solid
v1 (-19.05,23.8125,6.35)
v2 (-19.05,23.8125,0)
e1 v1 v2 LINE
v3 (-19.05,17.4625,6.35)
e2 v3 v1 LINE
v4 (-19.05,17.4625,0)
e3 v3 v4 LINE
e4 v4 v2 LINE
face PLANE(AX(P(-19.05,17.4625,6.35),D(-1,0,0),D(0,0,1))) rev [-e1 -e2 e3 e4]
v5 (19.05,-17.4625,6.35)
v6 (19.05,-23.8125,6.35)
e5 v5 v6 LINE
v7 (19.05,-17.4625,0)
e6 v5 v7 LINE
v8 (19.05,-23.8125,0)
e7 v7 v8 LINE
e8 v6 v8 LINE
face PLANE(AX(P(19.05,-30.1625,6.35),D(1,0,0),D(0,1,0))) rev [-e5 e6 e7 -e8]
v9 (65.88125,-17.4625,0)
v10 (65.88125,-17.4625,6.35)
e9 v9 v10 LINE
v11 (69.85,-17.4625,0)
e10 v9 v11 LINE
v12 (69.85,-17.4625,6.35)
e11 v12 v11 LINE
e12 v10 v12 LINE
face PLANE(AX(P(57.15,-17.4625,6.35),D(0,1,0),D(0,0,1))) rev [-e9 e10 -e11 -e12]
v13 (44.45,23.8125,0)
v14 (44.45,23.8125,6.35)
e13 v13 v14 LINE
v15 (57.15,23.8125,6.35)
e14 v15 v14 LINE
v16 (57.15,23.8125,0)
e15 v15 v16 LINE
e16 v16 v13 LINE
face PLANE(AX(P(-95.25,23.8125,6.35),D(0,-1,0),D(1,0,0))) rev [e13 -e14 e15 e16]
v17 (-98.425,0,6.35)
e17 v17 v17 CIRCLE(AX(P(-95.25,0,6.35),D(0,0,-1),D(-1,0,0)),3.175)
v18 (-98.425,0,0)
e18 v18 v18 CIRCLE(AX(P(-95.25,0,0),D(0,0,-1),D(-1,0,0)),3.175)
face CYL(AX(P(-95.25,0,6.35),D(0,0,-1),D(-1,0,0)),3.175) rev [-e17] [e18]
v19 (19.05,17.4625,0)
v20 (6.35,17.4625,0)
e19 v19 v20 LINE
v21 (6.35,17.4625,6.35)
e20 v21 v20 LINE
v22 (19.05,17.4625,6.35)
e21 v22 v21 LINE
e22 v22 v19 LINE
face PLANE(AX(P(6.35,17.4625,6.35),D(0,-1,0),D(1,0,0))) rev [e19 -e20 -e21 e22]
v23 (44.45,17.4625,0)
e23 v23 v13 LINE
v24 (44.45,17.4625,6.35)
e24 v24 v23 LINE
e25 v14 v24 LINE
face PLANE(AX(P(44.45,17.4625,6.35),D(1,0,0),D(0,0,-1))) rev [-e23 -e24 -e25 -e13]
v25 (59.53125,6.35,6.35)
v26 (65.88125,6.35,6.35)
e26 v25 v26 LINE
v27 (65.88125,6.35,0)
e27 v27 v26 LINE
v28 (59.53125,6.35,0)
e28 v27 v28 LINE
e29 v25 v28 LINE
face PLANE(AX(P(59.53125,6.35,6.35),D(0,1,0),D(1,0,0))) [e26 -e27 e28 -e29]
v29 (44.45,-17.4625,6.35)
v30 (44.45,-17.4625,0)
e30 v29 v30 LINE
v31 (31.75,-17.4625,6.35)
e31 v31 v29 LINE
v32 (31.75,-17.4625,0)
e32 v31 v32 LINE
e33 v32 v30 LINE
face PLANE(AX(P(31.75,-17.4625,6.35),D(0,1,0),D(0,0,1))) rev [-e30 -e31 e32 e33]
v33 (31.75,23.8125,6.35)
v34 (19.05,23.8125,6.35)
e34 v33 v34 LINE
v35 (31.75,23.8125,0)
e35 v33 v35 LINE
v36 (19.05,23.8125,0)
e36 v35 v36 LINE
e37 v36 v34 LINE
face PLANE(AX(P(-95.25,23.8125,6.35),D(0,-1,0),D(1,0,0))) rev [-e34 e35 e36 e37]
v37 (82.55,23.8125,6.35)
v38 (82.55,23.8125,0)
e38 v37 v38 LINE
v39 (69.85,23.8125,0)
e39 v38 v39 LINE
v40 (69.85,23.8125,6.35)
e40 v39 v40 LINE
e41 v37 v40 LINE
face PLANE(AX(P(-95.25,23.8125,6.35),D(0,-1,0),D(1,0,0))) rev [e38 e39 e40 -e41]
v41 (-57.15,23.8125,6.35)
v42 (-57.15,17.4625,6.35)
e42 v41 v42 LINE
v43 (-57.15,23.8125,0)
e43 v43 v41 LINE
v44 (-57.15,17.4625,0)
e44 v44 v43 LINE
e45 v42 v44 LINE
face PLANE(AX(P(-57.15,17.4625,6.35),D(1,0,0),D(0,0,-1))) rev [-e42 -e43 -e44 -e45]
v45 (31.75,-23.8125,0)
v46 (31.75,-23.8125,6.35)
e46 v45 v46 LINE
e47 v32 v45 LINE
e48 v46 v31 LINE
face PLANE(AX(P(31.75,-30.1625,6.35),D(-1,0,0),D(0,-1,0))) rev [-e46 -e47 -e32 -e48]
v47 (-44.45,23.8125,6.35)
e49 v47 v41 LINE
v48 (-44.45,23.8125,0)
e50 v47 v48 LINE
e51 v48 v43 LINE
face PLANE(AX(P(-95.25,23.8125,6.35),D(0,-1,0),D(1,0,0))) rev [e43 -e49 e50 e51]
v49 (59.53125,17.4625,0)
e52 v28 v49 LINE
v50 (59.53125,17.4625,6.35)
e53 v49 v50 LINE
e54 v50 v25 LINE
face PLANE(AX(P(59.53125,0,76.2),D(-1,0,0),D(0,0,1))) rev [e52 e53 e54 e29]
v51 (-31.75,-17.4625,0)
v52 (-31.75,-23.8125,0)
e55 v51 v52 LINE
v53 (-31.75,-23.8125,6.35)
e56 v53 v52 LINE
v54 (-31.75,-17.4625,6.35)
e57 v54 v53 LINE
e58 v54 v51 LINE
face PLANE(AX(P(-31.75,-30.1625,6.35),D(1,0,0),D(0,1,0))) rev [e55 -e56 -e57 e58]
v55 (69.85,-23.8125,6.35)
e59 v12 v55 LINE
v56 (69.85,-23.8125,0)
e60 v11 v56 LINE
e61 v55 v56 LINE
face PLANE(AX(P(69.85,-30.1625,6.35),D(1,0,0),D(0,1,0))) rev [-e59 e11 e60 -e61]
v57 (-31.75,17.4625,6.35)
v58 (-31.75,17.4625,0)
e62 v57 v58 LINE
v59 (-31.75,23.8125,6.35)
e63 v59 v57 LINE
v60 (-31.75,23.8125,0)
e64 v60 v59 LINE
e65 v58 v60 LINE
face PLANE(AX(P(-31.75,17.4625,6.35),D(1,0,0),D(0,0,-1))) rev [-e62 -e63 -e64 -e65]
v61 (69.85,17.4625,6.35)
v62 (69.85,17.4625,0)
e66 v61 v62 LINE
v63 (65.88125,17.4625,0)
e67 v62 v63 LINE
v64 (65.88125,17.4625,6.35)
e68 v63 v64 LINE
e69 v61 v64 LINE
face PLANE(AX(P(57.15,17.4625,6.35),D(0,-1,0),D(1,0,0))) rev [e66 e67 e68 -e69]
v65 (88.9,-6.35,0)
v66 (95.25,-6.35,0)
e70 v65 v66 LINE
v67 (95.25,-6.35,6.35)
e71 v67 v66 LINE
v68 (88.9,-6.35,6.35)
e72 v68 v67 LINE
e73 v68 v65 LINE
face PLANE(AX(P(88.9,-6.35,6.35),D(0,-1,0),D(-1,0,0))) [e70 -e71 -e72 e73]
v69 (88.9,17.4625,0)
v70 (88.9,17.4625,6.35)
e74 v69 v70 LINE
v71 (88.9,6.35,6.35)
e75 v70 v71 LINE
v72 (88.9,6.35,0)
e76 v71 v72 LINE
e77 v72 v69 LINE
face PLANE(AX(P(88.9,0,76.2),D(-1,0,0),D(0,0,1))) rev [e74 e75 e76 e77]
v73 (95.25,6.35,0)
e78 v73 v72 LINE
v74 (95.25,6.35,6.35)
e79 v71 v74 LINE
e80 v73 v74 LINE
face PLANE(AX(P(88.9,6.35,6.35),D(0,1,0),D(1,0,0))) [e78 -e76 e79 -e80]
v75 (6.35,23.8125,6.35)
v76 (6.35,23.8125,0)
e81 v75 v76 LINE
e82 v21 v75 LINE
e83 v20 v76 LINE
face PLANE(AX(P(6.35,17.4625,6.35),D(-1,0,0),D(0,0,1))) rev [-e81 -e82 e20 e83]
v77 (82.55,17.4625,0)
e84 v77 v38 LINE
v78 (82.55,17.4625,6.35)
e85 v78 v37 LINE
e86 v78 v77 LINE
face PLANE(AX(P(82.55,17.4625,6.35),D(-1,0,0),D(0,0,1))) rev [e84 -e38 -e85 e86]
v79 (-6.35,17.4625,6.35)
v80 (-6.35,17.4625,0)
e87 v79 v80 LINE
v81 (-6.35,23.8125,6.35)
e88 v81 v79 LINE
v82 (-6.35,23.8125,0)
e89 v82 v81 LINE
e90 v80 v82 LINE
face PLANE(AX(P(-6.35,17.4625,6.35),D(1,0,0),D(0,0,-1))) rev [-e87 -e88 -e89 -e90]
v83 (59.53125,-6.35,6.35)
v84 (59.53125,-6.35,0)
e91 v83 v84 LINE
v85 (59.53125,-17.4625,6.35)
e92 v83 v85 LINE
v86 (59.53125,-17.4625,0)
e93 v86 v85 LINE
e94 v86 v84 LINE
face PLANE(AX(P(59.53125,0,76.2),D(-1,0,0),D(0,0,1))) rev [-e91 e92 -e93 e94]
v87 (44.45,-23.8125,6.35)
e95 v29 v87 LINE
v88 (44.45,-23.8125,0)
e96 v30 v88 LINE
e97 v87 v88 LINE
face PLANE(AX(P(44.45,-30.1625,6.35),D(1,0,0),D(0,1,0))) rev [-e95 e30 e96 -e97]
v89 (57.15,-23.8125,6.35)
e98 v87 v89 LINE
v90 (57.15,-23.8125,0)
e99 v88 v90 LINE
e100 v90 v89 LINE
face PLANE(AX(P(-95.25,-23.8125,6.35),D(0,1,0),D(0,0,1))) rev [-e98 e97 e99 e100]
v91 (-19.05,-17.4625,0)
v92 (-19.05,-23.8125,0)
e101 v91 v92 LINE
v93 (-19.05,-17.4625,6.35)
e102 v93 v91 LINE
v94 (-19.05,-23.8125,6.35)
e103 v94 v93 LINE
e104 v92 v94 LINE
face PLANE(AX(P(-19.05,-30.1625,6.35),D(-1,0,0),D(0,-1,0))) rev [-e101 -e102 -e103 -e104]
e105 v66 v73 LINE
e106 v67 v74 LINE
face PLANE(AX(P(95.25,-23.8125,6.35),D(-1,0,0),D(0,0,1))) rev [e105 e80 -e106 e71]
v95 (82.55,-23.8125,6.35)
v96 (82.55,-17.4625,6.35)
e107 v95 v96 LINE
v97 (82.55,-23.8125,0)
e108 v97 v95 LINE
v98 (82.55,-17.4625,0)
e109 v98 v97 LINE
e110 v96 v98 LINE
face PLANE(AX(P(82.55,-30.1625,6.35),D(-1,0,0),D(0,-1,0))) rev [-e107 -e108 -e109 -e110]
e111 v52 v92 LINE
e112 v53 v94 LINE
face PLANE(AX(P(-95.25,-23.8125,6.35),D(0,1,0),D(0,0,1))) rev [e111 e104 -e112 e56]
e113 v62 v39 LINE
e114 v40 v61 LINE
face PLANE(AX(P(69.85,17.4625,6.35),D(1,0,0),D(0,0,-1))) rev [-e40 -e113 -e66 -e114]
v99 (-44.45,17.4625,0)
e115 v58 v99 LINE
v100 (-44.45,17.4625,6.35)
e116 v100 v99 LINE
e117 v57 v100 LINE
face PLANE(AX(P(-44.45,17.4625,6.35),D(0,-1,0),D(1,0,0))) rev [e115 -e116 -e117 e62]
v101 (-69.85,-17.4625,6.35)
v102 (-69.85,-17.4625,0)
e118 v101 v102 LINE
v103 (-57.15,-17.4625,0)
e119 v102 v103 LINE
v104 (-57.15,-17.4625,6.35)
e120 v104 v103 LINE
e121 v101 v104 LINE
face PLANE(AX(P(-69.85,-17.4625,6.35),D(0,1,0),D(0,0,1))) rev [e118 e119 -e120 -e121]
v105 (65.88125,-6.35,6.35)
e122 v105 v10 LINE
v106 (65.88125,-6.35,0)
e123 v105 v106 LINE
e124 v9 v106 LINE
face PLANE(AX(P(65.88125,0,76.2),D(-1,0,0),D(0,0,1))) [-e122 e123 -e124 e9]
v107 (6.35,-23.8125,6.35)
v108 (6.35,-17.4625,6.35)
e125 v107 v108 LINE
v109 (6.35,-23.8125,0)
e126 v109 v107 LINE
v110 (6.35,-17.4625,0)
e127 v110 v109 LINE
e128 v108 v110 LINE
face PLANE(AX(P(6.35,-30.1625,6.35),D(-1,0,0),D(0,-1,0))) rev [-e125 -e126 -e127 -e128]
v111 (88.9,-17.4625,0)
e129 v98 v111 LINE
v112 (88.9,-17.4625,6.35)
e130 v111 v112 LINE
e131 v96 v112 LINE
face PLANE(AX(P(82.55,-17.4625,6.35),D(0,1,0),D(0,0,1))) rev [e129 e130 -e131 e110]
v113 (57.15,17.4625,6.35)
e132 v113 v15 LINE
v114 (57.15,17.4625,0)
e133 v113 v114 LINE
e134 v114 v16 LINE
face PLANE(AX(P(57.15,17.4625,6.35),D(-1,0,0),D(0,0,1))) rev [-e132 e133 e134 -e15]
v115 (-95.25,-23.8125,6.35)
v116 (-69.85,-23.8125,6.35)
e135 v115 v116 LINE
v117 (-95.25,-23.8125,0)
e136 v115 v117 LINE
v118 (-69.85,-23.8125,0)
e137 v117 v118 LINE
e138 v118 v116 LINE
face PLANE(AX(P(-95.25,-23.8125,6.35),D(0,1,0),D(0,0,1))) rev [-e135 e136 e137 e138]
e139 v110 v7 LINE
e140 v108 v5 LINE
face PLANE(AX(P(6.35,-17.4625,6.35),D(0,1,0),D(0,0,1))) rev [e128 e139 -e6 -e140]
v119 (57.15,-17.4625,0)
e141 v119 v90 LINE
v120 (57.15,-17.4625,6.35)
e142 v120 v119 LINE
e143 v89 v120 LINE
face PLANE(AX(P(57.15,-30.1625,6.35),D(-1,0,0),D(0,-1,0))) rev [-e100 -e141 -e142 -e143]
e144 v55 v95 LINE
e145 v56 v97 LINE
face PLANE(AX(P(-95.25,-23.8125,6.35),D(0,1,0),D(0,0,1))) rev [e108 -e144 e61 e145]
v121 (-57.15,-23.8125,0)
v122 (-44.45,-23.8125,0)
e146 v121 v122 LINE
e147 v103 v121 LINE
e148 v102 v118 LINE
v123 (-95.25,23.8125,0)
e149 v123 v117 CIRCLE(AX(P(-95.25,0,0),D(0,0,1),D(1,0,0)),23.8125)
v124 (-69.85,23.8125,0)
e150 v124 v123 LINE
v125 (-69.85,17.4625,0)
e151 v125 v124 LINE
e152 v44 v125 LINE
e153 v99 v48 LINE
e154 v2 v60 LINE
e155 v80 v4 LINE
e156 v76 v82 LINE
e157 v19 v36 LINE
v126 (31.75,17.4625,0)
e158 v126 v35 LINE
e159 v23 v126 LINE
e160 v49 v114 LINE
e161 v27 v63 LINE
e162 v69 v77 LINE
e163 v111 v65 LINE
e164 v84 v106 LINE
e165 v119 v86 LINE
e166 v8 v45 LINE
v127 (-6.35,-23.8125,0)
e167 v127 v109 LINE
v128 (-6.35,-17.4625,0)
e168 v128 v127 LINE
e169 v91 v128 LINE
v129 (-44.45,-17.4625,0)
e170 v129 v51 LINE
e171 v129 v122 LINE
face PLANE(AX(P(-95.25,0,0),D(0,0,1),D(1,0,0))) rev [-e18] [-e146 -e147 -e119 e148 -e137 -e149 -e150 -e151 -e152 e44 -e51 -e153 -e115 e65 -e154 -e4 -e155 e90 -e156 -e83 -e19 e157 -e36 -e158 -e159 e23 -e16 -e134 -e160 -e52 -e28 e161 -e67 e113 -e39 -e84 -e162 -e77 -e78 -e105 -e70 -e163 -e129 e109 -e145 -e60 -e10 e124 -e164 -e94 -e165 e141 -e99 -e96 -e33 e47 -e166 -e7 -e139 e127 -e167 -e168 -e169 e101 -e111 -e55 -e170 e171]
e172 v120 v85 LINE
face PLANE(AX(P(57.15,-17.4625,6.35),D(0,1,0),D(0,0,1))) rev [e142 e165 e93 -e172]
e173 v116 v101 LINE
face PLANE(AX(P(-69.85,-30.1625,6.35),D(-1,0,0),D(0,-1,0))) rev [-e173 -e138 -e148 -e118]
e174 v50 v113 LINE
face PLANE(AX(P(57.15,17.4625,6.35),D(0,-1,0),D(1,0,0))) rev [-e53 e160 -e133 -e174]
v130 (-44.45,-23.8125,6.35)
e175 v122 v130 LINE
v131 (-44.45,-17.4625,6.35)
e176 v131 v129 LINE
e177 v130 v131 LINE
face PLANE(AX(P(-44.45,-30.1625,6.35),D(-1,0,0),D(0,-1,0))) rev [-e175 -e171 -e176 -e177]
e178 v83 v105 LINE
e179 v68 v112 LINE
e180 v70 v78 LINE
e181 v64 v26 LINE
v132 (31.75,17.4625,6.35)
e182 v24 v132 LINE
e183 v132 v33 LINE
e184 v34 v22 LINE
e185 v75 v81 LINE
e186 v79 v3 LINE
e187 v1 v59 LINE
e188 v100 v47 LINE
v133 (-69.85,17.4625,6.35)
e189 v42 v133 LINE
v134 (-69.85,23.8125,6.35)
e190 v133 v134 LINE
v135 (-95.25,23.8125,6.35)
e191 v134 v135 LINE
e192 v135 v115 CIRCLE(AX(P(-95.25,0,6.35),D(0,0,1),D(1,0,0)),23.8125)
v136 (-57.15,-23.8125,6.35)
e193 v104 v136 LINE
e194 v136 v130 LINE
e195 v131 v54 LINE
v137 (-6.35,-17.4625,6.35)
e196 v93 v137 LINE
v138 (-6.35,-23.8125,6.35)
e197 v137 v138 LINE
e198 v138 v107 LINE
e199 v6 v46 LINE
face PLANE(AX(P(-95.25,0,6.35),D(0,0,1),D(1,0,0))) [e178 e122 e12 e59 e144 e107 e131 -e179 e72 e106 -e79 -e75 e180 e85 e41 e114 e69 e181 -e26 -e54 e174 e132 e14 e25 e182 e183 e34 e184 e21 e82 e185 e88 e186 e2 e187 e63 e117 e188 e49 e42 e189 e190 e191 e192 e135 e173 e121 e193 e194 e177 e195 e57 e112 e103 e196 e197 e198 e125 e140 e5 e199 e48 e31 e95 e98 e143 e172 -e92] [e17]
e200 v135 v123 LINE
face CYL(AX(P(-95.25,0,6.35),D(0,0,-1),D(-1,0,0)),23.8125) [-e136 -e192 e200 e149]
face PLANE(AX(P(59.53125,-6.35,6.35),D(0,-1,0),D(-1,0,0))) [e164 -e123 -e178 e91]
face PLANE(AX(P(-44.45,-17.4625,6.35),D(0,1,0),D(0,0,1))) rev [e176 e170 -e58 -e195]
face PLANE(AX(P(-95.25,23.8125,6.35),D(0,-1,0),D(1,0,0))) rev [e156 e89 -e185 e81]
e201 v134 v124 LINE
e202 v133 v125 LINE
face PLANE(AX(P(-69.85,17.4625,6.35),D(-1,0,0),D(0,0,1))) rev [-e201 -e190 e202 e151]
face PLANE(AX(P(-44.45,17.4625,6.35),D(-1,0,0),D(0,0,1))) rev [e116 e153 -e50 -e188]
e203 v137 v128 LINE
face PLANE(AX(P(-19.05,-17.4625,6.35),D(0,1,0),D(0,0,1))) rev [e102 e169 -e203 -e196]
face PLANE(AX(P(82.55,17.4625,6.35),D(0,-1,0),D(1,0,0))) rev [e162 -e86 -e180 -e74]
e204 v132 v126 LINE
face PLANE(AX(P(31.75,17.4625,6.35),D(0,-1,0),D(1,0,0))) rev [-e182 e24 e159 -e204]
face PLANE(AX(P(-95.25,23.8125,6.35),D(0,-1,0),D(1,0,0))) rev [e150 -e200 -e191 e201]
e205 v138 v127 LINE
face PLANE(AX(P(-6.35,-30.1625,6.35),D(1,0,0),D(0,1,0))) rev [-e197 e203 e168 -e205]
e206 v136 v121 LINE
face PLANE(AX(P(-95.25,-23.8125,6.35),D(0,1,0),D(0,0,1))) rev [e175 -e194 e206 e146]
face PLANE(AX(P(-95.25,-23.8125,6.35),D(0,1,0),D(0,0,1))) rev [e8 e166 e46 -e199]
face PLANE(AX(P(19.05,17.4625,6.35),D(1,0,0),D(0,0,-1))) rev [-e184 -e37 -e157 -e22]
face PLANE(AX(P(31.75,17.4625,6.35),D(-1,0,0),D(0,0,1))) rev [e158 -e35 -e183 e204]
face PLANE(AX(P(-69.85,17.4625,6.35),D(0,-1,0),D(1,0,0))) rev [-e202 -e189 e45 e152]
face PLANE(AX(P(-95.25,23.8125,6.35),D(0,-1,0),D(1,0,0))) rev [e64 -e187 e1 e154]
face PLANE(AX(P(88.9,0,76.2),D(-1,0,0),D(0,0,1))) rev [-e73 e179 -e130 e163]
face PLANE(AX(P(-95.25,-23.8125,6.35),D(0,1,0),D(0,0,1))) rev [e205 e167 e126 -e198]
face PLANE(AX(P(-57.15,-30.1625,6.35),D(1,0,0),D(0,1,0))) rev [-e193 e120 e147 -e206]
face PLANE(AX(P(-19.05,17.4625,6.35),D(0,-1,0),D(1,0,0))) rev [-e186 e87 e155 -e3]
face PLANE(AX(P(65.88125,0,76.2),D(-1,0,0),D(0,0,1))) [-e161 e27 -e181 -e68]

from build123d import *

# Parameters (mm, degrees)
MASS_DEPTH          = 6.35
SKETCH4_R           = 3.175
CUT_EXTRUDE1_DEPTH  = 122.586333782
SKETCH3_W           = 12.7
SKETCH3_H           = 12.7
CUT_EXTRUDE2_DEPTH  = 122.586333782
LPATTERN1_COUNT     = 7
LPATTERN1_PITCH     = 25.4
CAVITY1_START       = 59.53125
CAVITY1_OUTLINE_W   = 11.1125
CAVITY1_OUTLINE_H   = 6.35
CAVITY1_DEPTH       = 6.35
CAVITY1_START_2     = 88.9
CAVITY1_2_OUTLINE_W = 11.1125
CAVITY1_2_OUTLINE_H = 6.35
CAVITY1_2_DEPTH     = 6.35


# Read off the part's stored shape, not the designer's step: Cavity1
with BuildPart() as part:
    # Sketch1 → Mass (new body)
    with BuildSketch(Plane.XY):
        with BuildLine():
            Line((-95.25, -23.8125), (95.25, -23.8125))
            Line((95.25, -23.8125), (95.25, 23.8125))
            Line((95.25, 23.8125), (-95.25, 23.8125))
            ThreePointArc((-95.25, 23.8125), (-119.0625, 0), (-95.25, -23.8125))
        make_face()
    extrude(amount=MASS_DEPTH)

    # Sketch4 → Cut-Extrude1 (cut, through all)
    with BuildSketch(Plane(origin=(0, 0, 0), x_dir=(-1, 0, 0), z_dir=(0, 0, -1))):
        with Locations((95.25, 0)):
            Circle(SKETCH4_R)
    extrude(amount=-CUT_EXTRUDE1_DEPTH, mode=Mode.SUBTRACT)

    # Sketch3 → Cut-Extrude2 (cut, through all)
    with BuildSketch(Plane(origin=(0, 0, 0), x_dir=(-1, 0, 0), z_dir=(0, 0, -1))):
        with Locations((-88.9, 23.8125)):
            Rectangle(SKETCH3_W, SKETCH3_H)
        with Locations((-88.9, -23.8125)):
            Rectangle(SKETCH3_W, SKETCH3_H)
    cut_extrude2 = extrude(amount=-CUT_EXTRUDE2_DEPTH, mode=Mode.SUBTRACT)

    # LPattern1: Cut-Extrude2 ×7
    with Locations(*[(-i * LPATTERN1_PITCH, 0, 0) for i in range(1, LPATTERN1_COUNT)]):
        add(cut_extrude2, mode=Mode.SUBTRACT)

    # Cavity1 outline → Cavity1 (cut)
    with BuildSketch(Plane.YZ.offset(CAVITY1_START)):
        with Locations((-11.90625, 3.175)):
            Rectangle(CAVITY1_OUTLINE_W, CAVITY1_OUTLINE_H)
        with Locations((11.90625, 3.175)):
            Rectangle(CAVITY1_OUTLINE_W, CAVITY1_OUTLINE_H)
    extrude(amount=CAVITY1_DEPTH, mode=Mode.SUBTRACT)

    # Cavity1 2 outline → Cavity1 2 (cut)
    with BuildSketch(Plane.YZ.offset(CAVITY1_START_2)):
        with Locations((-11.90625, 3.175)):
            Rectangle(CAVITY1_2_OUTLINE_W, CAVITY1_2_OUTLINE_H)
        with Locations((11.90625, 3.175)):
            Rectangle(CAVITY1_2_OUTLINE_W, CAVITY1_2_OUTLINE_H)
    extrude(amount=CAVITY1_2_DEPTH, mode=Mode.SUBTRACT)


solid = part.part
